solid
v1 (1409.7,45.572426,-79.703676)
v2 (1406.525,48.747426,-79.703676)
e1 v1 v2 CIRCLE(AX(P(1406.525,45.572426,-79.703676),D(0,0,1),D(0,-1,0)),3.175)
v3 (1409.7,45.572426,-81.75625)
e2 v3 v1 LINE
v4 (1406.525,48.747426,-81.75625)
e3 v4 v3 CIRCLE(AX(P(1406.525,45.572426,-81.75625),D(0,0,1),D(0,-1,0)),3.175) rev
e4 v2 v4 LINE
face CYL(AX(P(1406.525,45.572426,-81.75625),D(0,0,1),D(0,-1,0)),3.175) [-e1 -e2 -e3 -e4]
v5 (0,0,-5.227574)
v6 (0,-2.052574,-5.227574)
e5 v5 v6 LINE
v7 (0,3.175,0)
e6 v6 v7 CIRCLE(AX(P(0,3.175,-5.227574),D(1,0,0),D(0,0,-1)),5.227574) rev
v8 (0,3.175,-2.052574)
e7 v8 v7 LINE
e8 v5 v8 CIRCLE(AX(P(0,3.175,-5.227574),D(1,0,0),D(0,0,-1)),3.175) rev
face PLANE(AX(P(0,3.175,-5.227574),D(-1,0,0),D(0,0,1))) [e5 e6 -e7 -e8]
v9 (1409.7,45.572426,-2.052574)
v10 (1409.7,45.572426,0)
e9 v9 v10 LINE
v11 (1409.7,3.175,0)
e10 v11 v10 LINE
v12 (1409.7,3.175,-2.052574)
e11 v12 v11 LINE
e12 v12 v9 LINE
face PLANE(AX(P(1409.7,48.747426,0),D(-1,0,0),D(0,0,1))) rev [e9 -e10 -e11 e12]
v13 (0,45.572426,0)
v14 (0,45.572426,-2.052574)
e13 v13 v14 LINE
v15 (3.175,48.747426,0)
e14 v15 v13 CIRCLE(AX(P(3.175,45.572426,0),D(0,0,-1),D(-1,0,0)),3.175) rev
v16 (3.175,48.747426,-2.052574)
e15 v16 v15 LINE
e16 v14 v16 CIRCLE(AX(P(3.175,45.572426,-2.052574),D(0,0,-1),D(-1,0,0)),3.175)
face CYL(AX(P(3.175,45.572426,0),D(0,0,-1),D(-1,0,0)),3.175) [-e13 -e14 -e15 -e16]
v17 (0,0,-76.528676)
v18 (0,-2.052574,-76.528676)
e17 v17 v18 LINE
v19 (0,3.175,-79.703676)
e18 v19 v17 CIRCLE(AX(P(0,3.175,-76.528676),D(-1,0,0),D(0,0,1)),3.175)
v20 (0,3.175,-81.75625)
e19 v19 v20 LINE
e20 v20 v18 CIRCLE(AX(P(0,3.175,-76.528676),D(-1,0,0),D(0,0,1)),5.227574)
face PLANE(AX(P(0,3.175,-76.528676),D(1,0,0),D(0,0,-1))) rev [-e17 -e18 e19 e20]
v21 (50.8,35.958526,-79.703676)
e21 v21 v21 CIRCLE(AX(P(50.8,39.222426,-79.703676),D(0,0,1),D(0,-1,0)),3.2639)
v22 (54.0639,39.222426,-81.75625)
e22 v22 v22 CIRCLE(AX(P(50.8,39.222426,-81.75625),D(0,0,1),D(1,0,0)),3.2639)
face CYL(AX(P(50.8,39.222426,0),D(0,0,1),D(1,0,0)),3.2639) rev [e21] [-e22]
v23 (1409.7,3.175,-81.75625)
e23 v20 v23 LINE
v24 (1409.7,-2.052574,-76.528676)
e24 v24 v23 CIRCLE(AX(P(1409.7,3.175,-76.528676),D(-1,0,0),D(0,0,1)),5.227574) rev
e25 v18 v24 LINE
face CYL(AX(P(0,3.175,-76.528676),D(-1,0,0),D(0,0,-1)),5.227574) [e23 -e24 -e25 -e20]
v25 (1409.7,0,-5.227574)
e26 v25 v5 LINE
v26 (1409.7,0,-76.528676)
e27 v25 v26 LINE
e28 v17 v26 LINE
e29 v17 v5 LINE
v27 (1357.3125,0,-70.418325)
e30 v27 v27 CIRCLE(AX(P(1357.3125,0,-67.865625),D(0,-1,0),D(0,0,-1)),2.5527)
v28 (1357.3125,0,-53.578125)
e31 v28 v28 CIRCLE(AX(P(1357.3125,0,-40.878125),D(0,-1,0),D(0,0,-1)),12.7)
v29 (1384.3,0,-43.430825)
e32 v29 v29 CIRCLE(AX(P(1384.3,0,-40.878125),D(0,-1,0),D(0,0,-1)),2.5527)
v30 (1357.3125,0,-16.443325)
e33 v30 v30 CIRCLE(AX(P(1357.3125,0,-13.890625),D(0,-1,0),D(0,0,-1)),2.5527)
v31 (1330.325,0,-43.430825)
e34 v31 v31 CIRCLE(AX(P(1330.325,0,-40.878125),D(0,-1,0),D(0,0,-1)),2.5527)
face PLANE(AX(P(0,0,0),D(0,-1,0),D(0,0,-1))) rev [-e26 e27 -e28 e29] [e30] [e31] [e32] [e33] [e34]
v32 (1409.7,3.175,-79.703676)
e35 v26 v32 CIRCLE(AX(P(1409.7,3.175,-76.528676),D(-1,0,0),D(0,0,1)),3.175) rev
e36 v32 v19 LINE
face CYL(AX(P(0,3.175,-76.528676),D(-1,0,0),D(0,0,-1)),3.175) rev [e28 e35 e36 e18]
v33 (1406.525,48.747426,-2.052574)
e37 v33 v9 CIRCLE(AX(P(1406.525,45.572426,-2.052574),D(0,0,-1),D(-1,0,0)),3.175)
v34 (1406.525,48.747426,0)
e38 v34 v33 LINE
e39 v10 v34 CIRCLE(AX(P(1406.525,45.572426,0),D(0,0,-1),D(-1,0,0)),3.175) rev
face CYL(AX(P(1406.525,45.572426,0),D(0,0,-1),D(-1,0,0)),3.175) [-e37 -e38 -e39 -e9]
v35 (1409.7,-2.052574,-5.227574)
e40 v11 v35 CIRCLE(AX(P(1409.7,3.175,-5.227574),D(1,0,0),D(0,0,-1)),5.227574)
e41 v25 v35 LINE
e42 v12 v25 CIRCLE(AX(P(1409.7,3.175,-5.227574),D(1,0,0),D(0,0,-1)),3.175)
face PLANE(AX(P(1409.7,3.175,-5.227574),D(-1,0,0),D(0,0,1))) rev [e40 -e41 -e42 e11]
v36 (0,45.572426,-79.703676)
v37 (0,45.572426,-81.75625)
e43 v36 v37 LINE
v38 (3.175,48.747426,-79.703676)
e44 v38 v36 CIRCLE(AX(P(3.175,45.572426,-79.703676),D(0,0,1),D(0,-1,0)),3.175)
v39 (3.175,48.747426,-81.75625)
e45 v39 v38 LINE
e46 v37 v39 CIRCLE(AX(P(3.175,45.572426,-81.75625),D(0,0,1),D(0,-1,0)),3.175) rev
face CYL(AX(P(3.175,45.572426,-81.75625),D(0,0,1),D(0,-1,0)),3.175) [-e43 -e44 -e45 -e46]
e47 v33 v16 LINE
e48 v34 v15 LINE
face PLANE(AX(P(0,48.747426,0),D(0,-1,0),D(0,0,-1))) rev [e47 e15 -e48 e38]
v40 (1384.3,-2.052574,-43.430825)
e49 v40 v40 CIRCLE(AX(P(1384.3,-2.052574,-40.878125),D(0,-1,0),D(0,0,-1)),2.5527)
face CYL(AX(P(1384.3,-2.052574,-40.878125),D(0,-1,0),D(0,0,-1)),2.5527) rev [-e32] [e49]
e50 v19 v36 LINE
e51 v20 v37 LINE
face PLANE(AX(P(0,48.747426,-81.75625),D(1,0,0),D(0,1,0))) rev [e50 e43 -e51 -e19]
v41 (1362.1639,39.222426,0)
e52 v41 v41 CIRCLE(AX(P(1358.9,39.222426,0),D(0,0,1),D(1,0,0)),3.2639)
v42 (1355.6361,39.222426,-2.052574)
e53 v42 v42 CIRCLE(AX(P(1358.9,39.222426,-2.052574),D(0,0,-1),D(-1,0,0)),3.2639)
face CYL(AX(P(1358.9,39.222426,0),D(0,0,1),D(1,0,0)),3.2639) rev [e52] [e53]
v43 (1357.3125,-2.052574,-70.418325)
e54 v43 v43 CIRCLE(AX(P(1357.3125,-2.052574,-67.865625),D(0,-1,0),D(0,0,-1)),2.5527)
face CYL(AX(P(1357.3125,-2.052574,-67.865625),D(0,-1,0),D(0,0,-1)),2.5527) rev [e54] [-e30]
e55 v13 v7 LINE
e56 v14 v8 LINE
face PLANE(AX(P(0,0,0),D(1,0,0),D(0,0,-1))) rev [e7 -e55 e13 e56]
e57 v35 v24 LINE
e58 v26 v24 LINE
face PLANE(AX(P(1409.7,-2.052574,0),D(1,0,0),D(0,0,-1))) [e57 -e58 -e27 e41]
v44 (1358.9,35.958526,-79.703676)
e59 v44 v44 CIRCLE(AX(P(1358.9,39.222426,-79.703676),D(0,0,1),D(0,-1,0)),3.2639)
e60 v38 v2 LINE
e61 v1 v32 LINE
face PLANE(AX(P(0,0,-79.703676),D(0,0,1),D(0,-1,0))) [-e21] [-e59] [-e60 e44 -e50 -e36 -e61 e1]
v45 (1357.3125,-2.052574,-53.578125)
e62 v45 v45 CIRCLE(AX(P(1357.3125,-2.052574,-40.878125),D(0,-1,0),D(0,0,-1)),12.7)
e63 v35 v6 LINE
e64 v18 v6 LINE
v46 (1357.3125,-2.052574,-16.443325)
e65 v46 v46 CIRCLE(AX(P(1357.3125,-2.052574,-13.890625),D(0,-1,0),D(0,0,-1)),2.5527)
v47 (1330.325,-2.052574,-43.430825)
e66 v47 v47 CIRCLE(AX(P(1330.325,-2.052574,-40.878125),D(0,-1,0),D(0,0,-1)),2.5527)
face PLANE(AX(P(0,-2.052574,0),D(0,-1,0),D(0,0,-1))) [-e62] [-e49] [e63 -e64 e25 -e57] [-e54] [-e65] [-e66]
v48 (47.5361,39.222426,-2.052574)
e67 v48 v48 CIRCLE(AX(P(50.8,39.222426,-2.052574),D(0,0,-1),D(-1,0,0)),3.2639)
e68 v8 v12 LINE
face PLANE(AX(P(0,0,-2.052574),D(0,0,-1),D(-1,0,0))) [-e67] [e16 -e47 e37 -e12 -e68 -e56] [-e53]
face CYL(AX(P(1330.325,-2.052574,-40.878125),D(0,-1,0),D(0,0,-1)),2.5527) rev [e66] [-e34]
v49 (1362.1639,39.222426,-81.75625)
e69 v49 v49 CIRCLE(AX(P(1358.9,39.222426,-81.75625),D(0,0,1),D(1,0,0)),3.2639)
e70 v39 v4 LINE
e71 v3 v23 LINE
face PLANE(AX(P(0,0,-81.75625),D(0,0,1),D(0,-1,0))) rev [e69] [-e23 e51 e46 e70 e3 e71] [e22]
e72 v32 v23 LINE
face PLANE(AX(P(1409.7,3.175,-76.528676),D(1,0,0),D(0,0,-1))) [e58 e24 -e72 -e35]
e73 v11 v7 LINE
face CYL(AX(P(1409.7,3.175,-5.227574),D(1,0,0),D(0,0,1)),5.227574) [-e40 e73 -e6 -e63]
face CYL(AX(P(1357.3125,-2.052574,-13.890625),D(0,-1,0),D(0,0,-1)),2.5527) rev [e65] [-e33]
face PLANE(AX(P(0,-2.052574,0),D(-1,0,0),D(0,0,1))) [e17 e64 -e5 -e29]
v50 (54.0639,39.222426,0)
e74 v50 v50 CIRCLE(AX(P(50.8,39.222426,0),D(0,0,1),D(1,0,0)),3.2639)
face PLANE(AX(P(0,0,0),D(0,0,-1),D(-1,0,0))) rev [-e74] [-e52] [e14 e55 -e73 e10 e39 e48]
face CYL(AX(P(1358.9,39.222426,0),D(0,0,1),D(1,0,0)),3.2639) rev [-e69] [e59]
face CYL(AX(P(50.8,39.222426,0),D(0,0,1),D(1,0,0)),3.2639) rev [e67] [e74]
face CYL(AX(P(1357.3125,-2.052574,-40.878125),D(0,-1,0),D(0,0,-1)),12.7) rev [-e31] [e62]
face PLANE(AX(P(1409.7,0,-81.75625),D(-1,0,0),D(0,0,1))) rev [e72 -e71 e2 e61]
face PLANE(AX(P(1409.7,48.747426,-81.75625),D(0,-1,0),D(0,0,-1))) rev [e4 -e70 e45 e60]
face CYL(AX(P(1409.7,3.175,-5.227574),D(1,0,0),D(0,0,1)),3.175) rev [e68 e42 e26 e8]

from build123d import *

# Parameters (mm, degrees)
SKETCH1_W                      = 1409.7
SKETCH1_H                      = 81.75625
BASE_FLANGE1_DEPTH             = 2.052574
EDGE_FLANGE1_STRIP_W           = 14.560296
EDGE_FLANGE1_STRIP_H           = 2.052574
EDGE_FLANGE1_STRIP_CUT_DEPTH   = 1409.7
EDGE_FLANGE1_STRIP_2_W         = 14.560296
EDGE_FLANGE1_STRIP_2_H         = 2.052574
EDGE_FLANGE1_STRIP_CUT_2_DEPTH = 1409.7
EDGE_FLANGE1_DEPTH             = 1409.7
EDGE_FLANGE1_BEND_DEPTH        = 1409.7
F_7_0_201_DIAMETER_HOLE1_D     = 5.1054
F_0_257_DIAMETER_HOLE1_D       = 6.5278
FILLET1_R                      = 3.175
F_1_1_DIAMETER_HOLE1_D         = 25.4


# Sheet-metal steps are written as plain solids
with BuildPart() as part:
    # Sketch1 → Base-Flange1 (new body)
    with BuildSketch(Plane(origin=(0, 0, 0), x_dir=(1, 0, 0), z_dir=(0, 1, 0))):
        with Locations((704.85, 40.878125)):
            Rectangle(SKETCH1_W, SKETCH1_H)
    extrude(amount=-BASE_FLANGE1_DEPTH)

    # Edge-Flange1 strip (across the edge) → Edge-Flange1 strip cut (cut)
    with BuildSketch(Plane(origin=(0, 0, 0), x_dir=(0, 0, -1), z_dir=(1, 0, 0))):
        with Locations((-2.052574, -1.026287)):
            Rectangle(EDGE_FLANGE1_STRIP_W, EDGE_FLANGE1_STRIP_H)
    extrude(amount=EDGE_FLANGE1_STRIP_CUT_DEPTH, mode=Mode.SUBTRACT)

    # Edge-Flange1 strip 2 (across the edge) → Edge-Flange1 strip cut 2 (cut)
    with BuildSketch(Plane(origin=(1409.7, 0, -81.75625), x_dir=(0, 0, 1), z_dir=(-1, 0, 0))):
        with Locations((-2.052574, -1.026287)):
            Rectangle(EDGE_FLANGE1_STRIP_2_W, EDGE_FLANGE1_STRIP_2_H)
    extrude(amount=EDGE_FLANGE1_STRIP_CUT_2_DEPTH, mode=Mode.SUBTRACT)

    # Edge-Flange1 section (across the edge) → Edge-Flange1 (add)
    with BuildSketch(Plane(origin=(0, 0, 0), x_dir=(0, 0, -1), z_dir=(1, 0, 0))):
        with BuildLine():
            Line((0, 3.175), (0, 48.747426))
            Line((0, 48.747426), (2.052574, 48.747426))
            Line((2.052574, 48.747426), (2.052574, 3.175))
            ThreePointArc((2.052574, 3.175), (2.98250997, 0.92993597), (5.227574, 0))
            Line((5.227574, 0), (5.227574, -2.052574))
            ThreePointArc((5.227574, -2.052574), (1.531120975, -0.521453025), (0, 3.175))
        make_face()
    extrude(amount=EDGE_FLANGE1_DEPTH)

    # Edge-Flange1 section 2 (across the edge) → Edge-Flange1 bend (add)
    with BuildSketch(Plane(origin=(1409.7, 0, -81.75625), x_dir=(0, 0, 1), z_dir=(-1, 0, 0))):
        with BuildLine():
            Line((0, 3.175), (0, 48.747426))
            Line((0, 48.747426), (2.052574, 48.747426))
            Line((2.052574, 48.747426), (2.052574, 3.175))
            ThreePointArc((2.052574, 3.175), (2.98250997, 0.92993597), (5.227574, 0))
            Line((5.227574, 0), (5.227574, -2.052574))
            ThreePointArc((5.227574, -2.052574), (1.531120975, -0.521453025), (0, 3.175))
        make_face()
    extrude(amount=EDGE_FLANGE1_BEND_DEPTH)

    # #7 (0.201) Diameter Hole1 (through all)
    with Locations(Plane(origin=(0, -2.052574, 0), x_dir=(-1, 0, 0), z_dir=(0, -1, 0))):
        with Locations((-1384.3, 40.878125), (-1330.325, 40.878125), (-1357.3125, 67.865625), (-1357.3125, 13.890625)):
            Hole(F_7_0_201_DIAMETER_HOLE1_D / 2)

    # F (0.257) Diameter Hole1 (through all)
    with Locations(Plane.XY):
        with Locations((1358.9, 39.222426), (50.8, 39.222426)):
            Hole(F_0_257_DIAMETER_HOLE1_D / 2)

    # Fillet1
    fillet1_edges = [part.edges().sort_by_distance(p)[0] for p in [
        (0, 48.747426, -1.026287),
        (1409.7, 48.747426, -1.026287),
        (1409.7, 48.747426, -80.729963),
        (0, 48.747426, -80.729963),
    ]]
    fillet(fillet1_edges, radius=FILLET1_R)

    # 1 (1) Diameter Hole1 (through all)
    with Locations(Plane(origin=(0, -2.052574, 0), x_dir=(-1, 0, 0), z_dir=(0, -1, 0))):
        with Locations((-1357.3125, 40.878125)):
            Hole(F_1_1_DIAMETER_HOLE1_D / 2)


solid = part.part
